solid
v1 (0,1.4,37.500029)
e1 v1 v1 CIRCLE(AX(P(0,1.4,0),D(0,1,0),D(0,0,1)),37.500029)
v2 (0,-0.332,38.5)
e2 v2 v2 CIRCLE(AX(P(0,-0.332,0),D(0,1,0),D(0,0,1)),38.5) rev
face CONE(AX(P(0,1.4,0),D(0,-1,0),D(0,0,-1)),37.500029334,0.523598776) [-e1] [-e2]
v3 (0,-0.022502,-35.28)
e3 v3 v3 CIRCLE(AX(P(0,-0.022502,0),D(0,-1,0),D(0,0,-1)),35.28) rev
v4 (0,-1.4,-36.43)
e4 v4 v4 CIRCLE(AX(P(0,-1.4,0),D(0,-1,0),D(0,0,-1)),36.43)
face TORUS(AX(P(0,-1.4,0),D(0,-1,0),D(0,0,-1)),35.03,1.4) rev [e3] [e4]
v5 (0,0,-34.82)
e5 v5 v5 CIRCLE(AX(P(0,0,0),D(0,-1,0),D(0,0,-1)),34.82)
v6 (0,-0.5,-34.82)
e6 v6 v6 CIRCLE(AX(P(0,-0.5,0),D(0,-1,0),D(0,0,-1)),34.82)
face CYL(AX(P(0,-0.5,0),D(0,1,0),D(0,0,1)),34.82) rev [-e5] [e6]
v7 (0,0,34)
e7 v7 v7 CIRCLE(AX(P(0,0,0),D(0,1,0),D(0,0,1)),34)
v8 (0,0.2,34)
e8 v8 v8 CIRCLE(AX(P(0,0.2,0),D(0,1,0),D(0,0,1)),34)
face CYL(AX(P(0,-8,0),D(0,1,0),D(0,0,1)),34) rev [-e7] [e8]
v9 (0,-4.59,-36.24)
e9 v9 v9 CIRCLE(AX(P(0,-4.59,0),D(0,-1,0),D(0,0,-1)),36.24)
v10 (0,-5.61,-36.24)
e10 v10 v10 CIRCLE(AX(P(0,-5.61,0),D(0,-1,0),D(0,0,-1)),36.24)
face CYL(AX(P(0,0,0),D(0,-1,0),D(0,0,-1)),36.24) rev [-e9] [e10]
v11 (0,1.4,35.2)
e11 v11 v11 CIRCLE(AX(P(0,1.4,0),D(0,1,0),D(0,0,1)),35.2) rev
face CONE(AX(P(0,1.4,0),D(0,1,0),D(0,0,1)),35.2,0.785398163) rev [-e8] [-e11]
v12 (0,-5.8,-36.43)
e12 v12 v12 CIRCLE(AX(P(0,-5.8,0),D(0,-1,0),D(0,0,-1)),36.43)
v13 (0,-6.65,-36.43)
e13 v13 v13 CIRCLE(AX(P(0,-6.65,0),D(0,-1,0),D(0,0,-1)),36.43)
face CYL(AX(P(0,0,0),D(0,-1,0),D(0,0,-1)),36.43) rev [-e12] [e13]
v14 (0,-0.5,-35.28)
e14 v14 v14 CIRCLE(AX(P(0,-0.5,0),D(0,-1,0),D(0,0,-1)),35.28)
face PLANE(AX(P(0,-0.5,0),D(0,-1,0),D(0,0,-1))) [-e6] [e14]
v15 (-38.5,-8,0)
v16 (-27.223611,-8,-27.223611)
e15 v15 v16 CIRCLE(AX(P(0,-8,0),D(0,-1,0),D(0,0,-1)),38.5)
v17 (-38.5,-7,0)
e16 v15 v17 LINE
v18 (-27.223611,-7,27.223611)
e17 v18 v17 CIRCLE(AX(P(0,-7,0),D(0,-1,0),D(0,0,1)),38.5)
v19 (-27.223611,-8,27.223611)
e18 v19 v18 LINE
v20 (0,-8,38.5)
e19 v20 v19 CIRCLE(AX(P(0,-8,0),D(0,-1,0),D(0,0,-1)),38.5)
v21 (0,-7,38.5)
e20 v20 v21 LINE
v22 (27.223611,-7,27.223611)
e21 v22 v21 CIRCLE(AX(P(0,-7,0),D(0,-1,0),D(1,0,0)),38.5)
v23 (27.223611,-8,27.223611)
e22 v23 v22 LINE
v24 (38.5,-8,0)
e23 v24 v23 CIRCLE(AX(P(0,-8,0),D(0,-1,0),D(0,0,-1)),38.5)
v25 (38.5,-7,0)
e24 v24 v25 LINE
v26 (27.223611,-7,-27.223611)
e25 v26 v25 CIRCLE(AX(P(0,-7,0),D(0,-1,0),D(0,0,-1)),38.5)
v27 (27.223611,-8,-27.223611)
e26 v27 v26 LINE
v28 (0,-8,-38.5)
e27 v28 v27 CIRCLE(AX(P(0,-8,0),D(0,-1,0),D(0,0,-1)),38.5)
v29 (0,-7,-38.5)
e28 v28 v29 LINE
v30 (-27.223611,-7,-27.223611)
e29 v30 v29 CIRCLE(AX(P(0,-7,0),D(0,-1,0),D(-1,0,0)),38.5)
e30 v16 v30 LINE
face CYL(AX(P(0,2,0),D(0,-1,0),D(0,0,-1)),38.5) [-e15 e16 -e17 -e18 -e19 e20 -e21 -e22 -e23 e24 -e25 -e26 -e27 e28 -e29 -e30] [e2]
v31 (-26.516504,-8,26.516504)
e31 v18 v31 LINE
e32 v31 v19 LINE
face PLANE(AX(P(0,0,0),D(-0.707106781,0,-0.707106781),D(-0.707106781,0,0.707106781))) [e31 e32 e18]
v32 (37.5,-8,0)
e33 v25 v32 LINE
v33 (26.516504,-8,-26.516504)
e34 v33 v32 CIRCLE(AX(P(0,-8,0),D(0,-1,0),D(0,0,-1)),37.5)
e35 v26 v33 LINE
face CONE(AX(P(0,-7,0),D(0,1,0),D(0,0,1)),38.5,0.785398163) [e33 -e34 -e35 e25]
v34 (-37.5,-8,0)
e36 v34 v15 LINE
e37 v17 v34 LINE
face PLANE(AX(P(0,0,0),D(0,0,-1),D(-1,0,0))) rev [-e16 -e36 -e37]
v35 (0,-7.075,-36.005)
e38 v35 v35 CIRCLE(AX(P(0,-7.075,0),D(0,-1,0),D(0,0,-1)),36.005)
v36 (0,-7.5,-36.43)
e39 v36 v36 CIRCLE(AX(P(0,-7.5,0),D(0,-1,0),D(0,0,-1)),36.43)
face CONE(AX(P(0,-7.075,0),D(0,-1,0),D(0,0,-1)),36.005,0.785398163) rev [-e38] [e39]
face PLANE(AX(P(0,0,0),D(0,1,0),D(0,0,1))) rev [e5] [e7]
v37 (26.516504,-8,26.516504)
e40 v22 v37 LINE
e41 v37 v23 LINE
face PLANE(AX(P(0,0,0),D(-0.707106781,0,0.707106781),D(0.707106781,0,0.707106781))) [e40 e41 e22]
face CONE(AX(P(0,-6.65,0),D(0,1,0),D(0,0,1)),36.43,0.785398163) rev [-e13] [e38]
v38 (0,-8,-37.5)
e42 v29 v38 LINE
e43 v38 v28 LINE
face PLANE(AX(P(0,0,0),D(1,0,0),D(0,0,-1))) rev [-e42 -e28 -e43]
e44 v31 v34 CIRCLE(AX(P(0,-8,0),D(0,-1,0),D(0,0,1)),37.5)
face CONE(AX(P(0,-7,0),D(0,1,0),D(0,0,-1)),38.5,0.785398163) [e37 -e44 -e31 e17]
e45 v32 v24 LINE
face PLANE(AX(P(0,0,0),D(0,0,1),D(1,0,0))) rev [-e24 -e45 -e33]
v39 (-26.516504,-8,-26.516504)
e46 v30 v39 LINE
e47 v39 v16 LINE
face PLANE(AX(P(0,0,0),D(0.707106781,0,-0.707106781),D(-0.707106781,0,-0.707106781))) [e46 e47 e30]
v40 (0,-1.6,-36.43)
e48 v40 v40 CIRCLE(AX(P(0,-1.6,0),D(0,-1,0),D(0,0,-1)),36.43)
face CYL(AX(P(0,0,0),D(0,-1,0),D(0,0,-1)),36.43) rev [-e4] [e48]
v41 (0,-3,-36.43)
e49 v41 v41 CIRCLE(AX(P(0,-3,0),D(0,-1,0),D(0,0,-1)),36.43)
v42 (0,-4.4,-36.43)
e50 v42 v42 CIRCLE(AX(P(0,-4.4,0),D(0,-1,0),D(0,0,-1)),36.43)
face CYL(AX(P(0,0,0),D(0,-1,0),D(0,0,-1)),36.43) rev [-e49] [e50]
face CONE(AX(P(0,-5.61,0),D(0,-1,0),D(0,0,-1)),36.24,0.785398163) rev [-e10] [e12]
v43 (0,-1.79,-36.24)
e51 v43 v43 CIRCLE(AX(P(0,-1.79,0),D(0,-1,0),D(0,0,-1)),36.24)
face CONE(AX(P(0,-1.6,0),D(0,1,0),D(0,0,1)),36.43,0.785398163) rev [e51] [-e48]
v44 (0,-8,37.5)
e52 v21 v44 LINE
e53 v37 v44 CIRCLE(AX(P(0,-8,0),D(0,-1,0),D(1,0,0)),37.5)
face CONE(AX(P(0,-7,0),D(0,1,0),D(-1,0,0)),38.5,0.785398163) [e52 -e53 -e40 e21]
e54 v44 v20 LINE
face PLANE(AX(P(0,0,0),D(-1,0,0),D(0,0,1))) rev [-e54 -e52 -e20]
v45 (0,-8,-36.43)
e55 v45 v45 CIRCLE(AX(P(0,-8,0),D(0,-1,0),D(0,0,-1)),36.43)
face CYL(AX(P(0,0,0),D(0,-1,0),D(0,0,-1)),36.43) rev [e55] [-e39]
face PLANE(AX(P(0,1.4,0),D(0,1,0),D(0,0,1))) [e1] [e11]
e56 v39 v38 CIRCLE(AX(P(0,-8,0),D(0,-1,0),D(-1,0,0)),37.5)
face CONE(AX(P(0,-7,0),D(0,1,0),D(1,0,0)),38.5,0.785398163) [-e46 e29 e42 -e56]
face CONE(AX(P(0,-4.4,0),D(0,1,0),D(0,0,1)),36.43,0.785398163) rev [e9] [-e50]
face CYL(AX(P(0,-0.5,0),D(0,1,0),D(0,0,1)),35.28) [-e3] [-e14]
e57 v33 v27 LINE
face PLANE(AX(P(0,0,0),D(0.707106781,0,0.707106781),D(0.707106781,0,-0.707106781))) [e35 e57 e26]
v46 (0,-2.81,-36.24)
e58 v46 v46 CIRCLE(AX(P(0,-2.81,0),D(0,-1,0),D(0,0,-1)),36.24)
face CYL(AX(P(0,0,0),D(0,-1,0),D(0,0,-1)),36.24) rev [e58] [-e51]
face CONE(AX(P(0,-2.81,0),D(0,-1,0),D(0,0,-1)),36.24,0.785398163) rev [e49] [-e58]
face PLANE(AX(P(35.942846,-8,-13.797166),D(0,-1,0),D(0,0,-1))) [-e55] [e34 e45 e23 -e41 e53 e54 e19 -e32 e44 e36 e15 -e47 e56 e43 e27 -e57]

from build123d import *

# Parameters (mm, degrees)
SKETCH_1_R               = 38.5
EXTRUDE_1_DEPTH          = 2
SKETCH_3_R               = 34
CUT_EXTRUDE_1_DEPTH      = 56.357926262
CUT_EXTRUDE_START        = -0.6
SKETCH_4_R               = 38.5
CUT_EXTRUDE_2_DEPTH      = 0.6
CHAMFER_2_SIZE           = 1.2
CUT_REVOLVE_1_ANGLE      = 45
PATTERN_CIRCULAR_1_COUNT = 4
SKETCH_6_R               = 35.28
SKETCH_6_R_2             = 34.82
EXTRUDE_2_DEPTH          = 0.5


with BuildPart() as part:
    # 草图1 → 凸台-拉伸1 (new body)
    with BuildSketch(Plane(origin=(0, 0, 0), x_dir=(1, 0, 0), z_dir=(0, 1, 0))):
        with Locations(Location((0, 0, 0), (0, 0, 270))):
            Circle(SKETCH_1_R)
    extrude(amount=EXTRUDE_1_DEPTH)

    # 草图2 → 旋转1 (revolve)
    with BuildSketch(Plane(origin=(0, 0, 0), x_dir=(0.9335804264972116, 0, -0.3583679495452748), z_dir=(0.3583679495452748, 0, 0.9335804264972116)), mode=Mode.PRIVATE) as revolve_1_sk:
        with BuildLine():
            Line((36.43, -8), (36.43, -7.5))
            Line((36.43, -7.5), (36.005, -7.075))
            Line((36.005, -7.075), (36.43, -6.65))
            Line((36.43, -6.65), (36.43, -5.8))
            Line((36.43, -5.8), (36.24, -5.61))
            Line((36.24, -5.61), (36.24, -4.59))
            Line((36.24, -4.59), (36.43, -4.4))
            Line((36.43, -4.4), (36.43, -3))
            Line((36.43, -3), (36.24, -2.81))
            Line((36.24, -2.81), (36.24, -1.79))
            Line((36.24, -1.79), (36.43, -1.6))
            Line((36.43, -1.6), (36.43, -1.4))
            ThreePointArc((36.43, -1.4), (36.019949494, -0.410050506), (35.03, 0))
            Line((35.03, 0), (38.5, 0))
            Line((38.5, 0), (38.5, -8))
            Line((38.5, -8), (36.43, -8))
        make_face()
    revolve(revolve_1_sk.sketch.rotate(Axis((0, 0, 0), (0, 1, 0)), 69), axis=Axis((0, 0, 0), (0, 1, 0)))

    # 草图3 → 切除-拉伸1 (cut, through all)
    with BuildSketch(Plane(origin=(0, 2, 0), x_dir=(1, 0, 0), z_dir=(0, 1, 0))):
        with Locations(Location((0, 0, 0), (0, 0, 270))):
            Circle(SKETCH_3_R)
    extrude(amount=-CUT_EXTRUDE_1_DEPTH, mode=Mode.SUBTRACT)

    # 草图4 → 切除-拉伸2 (cut)
    with BuildSketch(Plane(origin=(0, 2, 0), x_dir=(1, 0, 0), z_dir=(0, 1, 0)).offset(CUT_EXTRUDE_START)):
        with Locations(Location((0, 0, 0), (0, 0, 90))):
            Circle(SKETCH_4_R)
    extrude(amount=CUT_EXTRUDE_2_DEPTH, mode=Mode.SUBTRACT)

    # 倒角1: read off the stored shape, not the designer's step
    # 倒角1 outline → 倒角1 (revolve, cut)
    with BuildSketch(Plane.XY):
        Polygon((38.5, 1.4), (37.500029334, 1.4), (38.5, -0.332), align=None)
    revolve(axis=Axis((0, 0, 0), (0, 1, 0)), mode=Mode.SUBTRACT)

    # 倒角2
    chamfer_2_edges = [part.edges().sort_by_distance(p)[0] for p in [
        (0, 1.4, -34),
    ]]
    chamfer(chamfer_2_edges, length=CHAMFER_2_SIZE)

    # 草图5 → 切除-旋转1 (revolve, cut)
    with BuildSketch(Plane.XY):
        Polygon((38.5, -8), (38.5, -7), (37.5, -8), align=None)
    cut_revolve_1 = revolve(axis=Axis((0, 0, 0), (0, 1, 0)), revolution_arc=CUT_REVOLVE_1_ANGLE, mode=Mode.SUBTRACT)

    # 阵列(圆周)1: 切除-旋转1 ×4 about axis
    pattern_circular_1_axis = Axis((0, 0, 0), (0, 1, 0))
    for i in range(1, PATTERN_CIRCULAR_1_COUNT):
        add(cut_revolve_1.rotate(pattern_circular_1_axis, i * 360 / PATTERN_CIRCULAR_1_COUNT), mode=Mode.SUBTRACT)

    # 草图6 → 凸台-拉伸2 (add)
    with BuildSketch(Plane.XZ):
        with Locations(Location((0, 0, 0), (0, 0, 270))):
            Circle(SKETCH_6_R)
        with Locations(Location((0, 0, 0), (0, 0, 270))):
            Circle(SKETCH_6_R_2, mode=Mode.SUBTRACT)
    extrude(amount=EXTRUDE_2_DEPTH)


solid = part.part
